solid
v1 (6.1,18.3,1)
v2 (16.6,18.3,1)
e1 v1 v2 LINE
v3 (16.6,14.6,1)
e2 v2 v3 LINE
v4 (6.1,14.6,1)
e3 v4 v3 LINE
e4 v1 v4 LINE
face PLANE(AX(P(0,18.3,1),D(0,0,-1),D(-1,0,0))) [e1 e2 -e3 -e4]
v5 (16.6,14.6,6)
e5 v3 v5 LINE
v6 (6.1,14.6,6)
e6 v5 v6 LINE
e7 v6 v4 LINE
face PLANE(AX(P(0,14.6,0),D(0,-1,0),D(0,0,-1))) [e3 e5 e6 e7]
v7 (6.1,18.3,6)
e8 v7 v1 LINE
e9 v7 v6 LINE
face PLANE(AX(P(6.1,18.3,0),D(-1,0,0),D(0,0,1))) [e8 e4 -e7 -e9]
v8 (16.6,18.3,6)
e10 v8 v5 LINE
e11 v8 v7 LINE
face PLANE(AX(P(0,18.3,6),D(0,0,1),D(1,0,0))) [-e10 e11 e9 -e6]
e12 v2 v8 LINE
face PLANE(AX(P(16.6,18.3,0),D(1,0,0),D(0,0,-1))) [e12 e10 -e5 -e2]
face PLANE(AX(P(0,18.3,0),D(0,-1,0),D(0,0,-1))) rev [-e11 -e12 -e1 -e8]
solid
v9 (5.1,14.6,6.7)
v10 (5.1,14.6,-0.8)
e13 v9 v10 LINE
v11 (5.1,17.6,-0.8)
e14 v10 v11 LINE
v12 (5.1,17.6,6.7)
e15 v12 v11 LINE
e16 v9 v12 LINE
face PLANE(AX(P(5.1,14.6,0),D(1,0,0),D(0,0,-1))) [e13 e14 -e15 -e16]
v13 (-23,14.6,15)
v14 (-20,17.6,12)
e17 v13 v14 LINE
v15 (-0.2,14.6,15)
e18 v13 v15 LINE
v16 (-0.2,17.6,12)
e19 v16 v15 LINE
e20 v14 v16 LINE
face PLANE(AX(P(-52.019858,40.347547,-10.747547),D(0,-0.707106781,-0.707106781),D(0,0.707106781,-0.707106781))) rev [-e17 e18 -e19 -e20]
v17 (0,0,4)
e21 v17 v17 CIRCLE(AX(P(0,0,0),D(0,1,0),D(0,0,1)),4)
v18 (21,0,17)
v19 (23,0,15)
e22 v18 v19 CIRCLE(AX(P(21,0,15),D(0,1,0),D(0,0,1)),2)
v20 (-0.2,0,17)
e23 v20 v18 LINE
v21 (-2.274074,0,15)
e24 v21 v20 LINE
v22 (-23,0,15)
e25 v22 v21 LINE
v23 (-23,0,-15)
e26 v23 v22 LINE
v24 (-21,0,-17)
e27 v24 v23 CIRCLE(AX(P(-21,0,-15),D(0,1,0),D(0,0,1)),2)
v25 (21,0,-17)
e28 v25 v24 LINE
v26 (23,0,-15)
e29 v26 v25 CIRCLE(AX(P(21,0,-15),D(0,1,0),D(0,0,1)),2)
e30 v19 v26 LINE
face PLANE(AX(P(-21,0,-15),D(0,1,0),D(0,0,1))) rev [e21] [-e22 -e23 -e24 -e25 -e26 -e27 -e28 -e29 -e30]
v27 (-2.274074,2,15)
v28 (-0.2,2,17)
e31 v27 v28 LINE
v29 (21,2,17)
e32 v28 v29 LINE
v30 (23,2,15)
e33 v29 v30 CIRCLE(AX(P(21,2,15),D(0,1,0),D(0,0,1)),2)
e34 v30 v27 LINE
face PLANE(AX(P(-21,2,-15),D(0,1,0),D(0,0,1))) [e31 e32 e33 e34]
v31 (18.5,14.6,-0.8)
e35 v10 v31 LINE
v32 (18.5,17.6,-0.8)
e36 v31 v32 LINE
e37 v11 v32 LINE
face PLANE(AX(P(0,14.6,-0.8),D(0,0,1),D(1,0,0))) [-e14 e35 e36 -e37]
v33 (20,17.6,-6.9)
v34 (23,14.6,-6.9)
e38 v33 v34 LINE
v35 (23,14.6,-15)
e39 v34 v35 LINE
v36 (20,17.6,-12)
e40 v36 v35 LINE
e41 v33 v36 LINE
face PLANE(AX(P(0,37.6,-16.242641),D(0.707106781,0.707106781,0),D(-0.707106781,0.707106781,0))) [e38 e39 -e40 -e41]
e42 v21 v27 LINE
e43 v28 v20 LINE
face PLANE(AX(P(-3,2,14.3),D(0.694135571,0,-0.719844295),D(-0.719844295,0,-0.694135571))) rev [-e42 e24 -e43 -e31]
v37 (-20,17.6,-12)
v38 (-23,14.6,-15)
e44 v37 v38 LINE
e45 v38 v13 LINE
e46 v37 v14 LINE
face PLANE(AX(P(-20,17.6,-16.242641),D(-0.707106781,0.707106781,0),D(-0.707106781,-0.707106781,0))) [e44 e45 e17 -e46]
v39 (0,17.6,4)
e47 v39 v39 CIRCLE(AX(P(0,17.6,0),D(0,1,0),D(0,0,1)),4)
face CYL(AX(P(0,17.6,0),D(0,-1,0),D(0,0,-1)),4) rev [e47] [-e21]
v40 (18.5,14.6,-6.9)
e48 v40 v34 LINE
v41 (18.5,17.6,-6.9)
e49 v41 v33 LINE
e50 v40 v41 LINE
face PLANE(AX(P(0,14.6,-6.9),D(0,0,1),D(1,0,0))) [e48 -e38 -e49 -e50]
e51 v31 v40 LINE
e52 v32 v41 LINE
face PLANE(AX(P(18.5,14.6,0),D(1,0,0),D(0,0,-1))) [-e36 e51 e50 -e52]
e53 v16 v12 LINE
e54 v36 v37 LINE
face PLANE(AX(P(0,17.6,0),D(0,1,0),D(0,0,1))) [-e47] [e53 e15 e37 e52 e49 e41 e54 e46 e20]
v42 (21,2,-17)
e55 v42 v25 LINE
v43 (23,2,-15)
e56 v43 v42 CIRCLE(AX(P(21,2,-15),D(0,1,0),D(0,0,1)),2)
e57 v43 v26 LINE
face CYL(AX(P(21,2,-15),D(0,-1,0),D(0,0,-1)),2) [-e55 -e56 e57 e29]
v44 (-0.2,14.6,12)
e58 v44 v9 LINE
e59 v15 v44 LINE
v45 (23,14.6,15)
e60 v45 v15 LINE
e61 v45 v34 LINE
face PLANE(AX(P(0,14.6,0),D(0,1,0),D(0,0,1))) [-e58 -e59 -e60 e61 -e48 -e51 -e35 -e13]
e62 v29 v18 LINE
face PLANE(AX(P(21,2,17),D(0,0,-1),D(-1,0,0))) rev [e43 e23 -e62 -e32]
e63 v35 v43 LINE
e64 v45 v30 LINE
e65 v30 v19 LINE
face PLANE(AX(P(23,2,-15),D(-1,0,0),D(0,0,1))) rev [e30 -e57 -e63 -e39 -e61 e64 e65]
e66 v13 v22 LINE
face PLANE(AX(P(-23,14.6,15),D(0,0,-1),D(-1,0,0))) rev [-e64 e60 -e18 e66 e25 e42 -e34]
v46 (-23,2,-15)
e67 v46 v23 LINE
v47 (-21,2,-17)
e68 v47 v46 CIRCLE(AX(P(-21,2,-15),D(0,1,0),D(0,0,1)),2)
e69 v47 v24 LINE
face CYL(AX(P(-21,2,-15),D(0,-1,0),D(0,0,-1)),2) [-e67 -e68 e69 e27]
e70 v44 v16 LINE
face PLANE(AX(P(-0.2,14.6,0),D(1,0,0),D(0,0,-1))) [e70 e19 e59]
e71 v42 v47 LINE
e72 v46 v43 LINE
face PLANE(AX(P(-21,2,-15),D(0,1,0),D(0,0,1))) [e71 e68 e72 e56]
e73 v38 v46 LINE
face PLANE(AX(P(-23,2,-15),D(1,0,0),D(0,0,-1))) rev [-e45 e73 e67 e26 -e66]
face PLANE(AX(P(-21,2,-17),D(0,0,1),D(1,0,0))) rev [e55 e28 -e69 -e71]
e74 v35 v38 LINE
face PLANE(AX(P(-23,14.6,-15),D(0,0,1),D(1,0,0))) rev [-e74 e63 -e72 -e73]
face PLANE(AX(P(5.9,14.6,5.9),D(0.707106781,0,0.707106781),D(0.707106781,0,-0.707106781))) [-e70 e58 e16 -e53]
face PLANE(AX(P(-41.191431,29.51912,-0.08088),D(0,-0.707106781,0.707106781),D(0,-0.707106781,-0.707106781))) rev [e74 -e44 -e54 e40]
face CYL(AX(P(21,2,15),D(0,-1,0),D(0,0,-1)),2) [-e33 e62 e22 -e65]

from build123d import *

# Parameters (mm, degrees)
SKETCH_13_R         = 4.5
EXTRUDE_8_DEPTH     = 2
SKETCH_14_W         = 46
SKETCH_14_H         = 30
SKETCH_14_R         = 4.5
EXTRUDE_9_DEPTH     = 14.6
SKETCH_15_W         = 40
SKETCH_15_H         = 24
SKETCH_15_R         = 4
EXTRUDE_10_DEPTH    = 17.6
EXTRUDE_START       = 12
EXTRUDE_11_DEPTH    = 24
EXTRUDE_START_2     = -23
EXTRUDE_12_DEPTH    = 46
EXTRUDE_START_3     = -16
EXTRUDE_12_2_DEPTH  = 32
CUT_EXTRUDE_START   = 17.6
CUT_EXTRUDE_2_DEPTH = 3
EXTRUDE_START_4     = 14.6
SKETCH_19_W         = 10.5
SKETCH_19_H         = 5
EXTRUDE_13_DEPTH    = 3.7


with BuildPart() as part:
    # 草图13 → 凸台-拉伸8 (new body)
    with BuildSketch(Plane(origin=(0, 0, 0), x_dir=(1, 0, 0), z_dir=(0, 1, 0))):
        with BuildLine():
            Line((-23, -14.3), (-3, -14.3))
            Line((-3, -14.3), (-0.2, -17))
            Line((-0.2, -17), (21, -17))
            ThreePointArc((21, -17), (22.414213562, -16.414213562), (23, -15))
            Line((23, -15), (23, 15))
            ThreePointArc((23, 15), (22.414213562, 16.414213562), (21, 17))
            Line((21, 17), (-21, 17))
            ThreePointArc((-21, 17), (-22.414213562, 16.414213562), (-23, 15))
            Line((-23, 15), (-23, -14.3))
        make_face()
        with Locations(Location((0, 0, 0), (0, 0, 270))):
            Circle(SKETCH_13_R, mode=Mode.SUBTRACT)
    extrude(amount=EXTRUDE_8_DEPTH)

    # 草图14 → 凸台-拉伸9 (add)
    with BuildSketch(Plane(origin=(0, 0, 0), x_dir=(1, 0, 0), z_dir=(0, 1, 0))):
        Rectangle(SKETCH_14_W, SKETCH_14_H)
        with Locations(Location((0, 0, 0), (0, 0, 270))):
            Circle(SKETCH_14_R, mode=Mode.SUBTRACT)
    extrude(amount=EXTRUDE_9_DEPTH)

    # 草图15 → 凸台-拉伸10 (add)
    with BuildSketch(Plane(origin=(0, 0, 0), x_dir=(1, 0, 0), z_dir=(0, 1, 0))):
        Rectangle(SKETCH_15_W, SKETCH_15_H)
        with Locations(Location((0, 0, 0), (0, 0, 270))):
            Circle(SKETCH_15_R, mode=Mode.SUBTRACT)
    extrude(amount=EXTRUDE_10_DEPTH)

    # 草图16 → 凸台-拉伸11 (add)
    with BuildSketch(Plane.XY.offset(EXTRUDE_START)):
        Polygon((-20, 14.6), (-20, 17.6), (-23, 14.6), align=None)
        Polygon((20, 17.6), (20, 14.6), (23, 14.6), align=None)
    extrude(amount=-EXTRUDE_11_DEPTH)

    # 凸台-拉伸12: read off the stored shape, not the designer's step
    # 凸台-拉伸12 outline → 凸台-拉伸12 (add)
    with BuildSketch(Plane(origin=(0, 0, 0), x_dir=(0, 0, -1), z_dir=(1, 0, 0)).offset(EXTRUDE_START_2)):
        Polygon((15, 14.6), (12, 17.6), (12, 14.6), align=None)
        Polygon((-12, 17.6), (-15, 14.6), (-12, 14.6), align=None)
    extrude(amount=EXTRUDE_12_DEPTH)

    # Extrude 12 2 outline → Extrude 12 2 (cut)
    with BuildSketch(Plane.XY.offset(EXTRUDE_START_3)):
        Polygon((-23, 14.6), (-18.6, 19), (-23, 19), align=None)
        Polygon((23, 19), (18.6, 19), (23, 14.6), align=None)
    extrude(amount=EXTRUDE_12_2_DEPTH, mode=Mode.SUBTRACT)

    # 草图18 → 切除-拉伸2 (cut)
    with BuildSketch(Plane(origin=(0, 0, 0), x_dir=(1, 0, 0), z_dir=(0, 1, 0)).offset(CUT_EXTRUDE_START)):
        Polygon((-0.2, -15), (-0.2, -12), (5.1, -6.7), (5.1, 0.8), (18.5, 0.8), (18.5, 6.9), (23, 6.9), (23, -15), align=None)
    extrude(amount=-CUT_EXTRUDE_2_DEPTH, mode=Mode.SUBTRACT)


with BuildPart() as body_2:
    # 草图19 → 凸台-拉伸13 (new body)
    with BuildSketch(Plane(origin=(0, 0, 0), x_dir=(1, 0, 0), z_dir=(0, 1, 0)).offset(EXTRUDE_START_4)):
        with Locations((11.35, -3.5)):
            Rectangle(SKETCH_19_W, SKETCH_19_H)
    extrude(amount=EXTRUDE_13_DEPTH)


solid = Compound([part.part, body_2.part])
